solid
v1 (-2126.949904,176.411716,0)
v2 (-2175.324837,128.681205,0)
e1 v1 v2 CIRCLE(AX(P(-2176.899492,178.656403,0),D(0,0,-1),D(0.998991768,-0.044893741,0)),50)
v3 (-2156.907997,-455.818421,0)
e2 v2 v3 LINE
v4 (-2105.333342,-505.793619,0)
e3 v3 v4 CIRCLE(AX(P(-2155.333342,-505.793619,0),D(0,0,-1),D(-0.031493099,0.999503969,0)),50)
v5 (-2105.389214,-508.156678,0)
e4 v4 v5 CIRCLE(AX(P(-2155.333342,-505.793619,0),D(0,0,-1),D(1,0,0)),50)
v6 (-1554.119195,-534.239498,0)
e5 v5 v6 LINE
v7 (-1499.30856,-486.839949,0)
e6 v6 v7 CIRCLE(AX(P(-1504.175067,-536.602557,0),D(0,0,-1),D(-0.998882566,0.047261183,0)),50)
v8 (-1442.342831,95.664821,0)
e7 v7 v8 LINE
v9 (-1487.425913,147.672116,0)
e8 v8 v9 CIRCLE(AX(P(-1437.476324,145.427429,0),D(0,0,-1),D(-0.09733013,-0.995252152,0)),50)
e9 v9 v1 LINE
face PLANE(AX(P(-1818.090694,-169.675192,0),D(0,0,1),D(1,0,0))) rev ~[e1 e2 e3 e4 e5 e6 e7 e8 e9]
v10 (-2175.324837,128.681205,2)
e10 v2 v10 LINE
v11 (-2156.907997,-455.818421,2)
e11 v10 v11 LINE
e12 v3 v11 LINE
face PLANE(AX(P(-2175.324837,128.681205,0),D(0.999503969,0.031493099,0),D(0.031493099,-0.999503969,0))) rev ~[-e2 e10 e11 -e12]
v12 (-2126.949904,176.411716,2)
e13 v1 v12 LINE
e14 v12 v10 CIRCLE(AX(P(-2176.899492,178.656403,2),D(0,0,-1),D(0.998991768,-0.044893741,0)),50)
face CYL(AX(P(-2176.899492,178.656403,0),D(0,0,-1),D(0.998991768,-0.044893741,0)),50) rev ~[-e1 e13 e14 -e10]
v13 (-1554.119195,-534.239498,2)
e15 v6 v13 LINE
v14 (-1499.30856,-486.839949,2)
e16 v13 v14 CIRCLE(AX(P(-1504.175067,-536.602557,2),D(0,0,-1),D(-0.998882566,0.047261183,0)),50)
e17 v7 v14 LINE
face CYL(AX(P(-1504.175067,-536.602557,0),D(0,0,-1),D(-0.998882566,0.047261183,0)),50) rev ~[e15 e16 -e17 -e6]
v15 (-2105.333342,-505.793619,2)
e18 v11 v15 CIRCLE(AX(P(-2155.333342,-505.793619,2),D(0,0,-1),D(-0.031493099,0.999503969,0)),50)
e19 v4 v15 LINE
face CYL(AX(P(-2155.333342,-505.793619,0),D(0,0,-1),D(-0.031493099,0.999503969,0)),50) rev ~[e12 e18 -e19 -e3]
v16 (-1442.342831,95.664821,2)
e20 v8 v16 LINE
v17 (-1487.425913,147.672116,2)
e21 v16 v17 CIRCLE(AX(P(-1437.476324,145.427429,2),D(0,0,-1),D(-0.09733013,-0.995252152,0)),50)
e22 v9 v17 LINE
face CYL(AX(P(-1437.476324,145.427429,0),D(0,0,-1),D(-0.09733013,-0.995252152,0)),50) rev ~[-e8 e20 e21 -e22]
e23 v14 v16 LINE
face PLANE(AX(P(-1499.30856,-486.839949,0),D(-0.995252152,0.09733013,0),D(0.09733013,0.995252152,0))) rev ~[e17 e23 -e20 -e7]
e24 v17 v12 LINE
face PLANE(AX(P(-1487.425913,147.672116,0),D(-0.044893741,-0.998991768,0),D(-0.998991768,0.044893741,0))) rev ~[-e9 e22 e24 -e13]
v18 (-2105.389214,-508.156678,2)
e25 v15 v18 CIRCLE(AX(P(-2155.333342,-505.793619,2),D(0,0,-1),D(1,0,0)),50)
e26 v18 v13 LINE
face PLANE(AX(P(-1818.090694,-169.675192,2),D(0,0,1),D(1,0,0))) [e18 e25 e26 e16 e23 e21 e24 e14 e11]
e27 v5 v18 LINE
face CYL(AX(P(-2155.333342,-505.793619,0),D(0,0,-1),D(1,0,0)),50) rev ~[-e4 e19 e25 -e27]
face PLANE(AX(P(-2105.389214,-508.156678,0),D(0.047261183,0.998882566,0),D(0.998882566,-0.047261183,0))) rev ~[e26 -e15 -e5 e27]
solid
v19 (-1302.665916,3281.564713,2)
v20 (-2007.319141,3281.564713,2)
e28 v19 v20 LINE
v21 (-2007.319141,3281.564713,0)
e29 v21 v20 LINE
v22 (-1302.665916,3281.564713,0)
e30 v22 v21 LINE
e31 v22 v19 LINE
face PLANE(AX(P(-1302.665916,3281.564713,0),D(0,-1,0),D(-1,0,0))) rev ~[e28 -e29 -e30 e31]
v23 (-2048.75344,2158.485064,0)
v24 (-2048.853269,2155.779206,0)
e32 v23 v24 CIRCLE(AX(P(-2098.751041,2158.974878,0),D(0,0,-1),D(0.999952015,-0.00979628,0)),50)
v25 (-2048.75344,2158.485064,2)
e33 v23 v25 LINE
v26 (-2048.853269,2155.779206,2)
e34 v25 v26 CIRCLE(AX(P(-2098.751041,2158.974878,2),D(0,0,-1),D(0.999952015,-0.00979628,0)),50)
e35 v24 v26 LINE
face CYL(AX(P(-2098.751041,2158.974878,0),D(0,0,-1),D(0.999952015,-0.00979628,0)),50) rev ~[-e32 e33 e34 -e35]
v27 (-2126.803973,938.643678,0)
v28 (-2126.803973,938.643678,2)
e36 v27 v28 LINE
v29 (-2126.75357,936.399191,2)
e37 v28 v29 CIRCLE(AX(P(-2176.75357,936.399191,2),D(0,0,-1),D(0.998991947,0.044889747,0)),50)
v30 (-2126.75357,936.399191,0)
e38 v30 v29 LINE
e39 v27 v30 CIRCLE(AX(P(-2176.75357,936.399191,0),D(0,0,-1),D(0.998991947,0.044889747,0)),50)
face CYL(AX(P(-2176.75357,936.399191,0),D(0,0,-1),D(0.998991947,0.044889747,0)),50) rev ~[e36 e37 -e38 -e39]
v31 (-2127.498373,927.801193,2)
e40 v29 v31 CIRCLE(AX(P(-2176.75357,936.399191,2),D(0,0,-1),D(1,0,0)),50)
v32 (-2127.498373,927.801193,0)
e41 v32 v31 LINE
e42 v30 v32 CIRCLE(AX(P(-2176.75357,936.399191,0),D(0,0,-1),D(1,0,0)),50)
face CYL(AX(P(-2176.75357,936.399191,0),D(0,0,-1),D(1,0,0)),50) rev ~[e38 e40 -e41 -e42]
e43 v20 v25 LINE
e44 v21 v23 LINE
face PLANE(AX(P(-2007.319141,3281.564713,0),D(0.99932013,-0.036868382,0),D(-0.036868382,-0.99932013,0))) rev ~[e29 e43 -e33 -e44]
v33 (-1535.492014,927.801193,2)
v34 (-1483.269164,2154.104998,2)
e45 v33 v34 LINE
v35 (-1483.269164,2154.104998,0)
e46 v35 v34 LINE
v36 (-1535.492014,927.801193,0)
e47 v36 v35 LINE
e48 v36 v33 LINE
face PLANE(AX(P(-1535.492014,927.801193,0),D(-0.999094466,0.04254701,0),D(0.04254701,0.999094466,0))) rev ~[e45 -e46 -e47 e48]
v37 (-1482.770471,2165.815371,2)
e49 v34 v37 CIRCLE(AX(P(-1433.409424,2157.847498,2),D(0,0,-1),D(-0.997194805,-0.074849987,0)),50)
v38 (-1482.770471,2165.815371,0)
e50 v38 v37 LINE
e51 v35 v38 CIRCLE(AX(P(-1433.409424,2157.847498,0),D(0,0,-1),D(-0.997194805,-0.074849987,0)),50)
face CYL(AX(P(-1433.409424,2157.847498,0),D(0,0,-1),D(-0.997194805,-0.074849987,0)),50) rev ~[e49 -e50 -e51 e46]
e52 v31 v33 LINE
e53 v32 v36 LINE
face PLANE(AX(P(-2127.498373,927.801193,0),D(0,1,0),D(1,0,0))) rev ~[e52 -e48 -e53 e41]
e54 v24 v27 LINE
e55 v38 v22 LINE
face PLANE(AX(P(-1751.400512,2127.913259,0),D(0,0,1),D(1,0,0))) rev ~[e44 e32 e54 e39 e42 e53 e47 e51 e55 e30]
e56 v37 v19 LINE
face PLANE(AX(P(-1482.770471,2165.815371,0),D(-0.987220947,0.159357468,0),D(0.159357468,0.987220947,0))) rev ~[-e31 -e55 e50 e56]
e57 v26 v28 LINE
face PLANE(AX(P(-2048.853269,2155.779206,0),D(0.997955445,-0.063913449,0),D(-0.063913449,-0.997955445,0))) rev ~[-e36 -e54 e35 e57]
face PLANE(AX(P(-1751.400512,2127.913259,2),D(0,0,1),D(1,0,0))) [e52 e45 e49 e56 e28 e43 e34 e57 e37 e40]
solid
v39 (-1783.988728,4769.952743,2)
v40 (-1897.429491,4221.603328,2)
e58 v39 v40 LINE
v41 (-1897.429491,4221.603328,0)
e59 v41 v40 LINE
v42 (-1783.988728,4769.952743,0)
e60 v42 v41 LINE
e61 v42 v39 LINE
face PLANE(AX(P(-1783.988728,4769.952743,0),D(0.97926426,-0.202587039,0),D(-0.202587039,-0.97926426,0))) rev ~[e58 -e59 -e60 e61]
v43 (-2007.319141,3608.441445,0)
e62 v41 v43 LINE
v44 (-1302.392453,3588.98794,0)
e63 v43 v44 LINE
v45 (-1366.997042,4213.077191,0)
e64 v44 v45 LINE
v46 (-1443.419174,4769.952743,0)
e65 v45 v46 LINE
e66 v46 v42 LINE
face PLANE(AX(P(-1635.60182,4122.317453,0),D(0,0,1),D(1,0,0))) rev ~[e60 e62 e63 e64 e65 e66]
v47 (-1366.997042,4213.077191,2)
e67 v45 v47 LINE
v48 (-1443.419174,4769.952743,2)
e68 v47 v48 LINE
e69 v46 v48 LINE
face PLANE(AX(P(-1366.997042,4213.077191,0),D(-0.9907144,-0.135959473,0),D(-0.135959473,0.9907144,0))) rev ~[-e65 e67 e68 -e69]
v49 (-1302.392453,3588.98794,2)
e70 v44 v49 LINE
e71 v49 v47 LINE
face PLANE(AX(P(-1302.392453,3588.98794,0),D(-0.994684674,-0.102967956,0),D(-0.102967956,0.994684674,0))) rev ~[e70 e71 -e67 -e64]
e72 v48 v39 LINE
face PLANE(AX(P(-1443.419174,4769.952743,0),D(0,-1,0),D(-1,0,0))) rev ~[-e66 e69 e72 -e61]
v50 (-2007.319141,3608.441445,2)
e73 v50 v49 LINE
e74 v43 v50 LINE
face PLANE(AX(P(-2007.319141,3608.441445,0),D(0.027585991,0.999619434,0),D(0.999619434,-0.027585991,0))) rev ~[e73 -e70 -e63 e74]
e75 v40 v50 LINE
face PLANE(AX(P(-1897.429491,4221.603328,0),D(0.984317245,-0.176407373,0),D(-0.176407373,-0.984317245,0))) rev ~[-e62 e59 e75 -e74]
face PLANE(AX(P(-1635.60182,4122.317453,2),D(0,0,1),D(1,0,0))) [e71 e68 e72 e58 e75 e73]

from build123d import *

# Parameters (mm, degrees)
F3_DEPTH = 2
F4_DEPTH = 2
F5_DEPTH = 2


with BuildPart() as f3:
    # F2 (on face) → F3 (new body)
    with BuildSketch(Plane.XY):
        Polygon((-1443.4191744163, 4769.9527426873), (-1783.9887283179, 4769.9527426873), (-1897.4294909214, 4221.6033277621), (-2007.3191407106, 3608.4414445777), (-1302.3924530881, 3588.9879399751), (-1366.9970424155, 4213.0771913099), align=None)
    extrude(amount=F3_DEPTH)


with BuildPart() as f4:
    # F2 (on face) → F4 (new body)
    with BuildSketch(Plane.XY):
        with BuildLine():
            Line((-1482.7704714546, 2165.8153709844), (-1302.6659156704, 3281.5647125244))
            Line((-1302.6659156704, 3281.5647125244), (-2007.3191407106, 3281.5647125244))
            Line((-2007.3191407106, 3281.5647125244), (-2048.7534404071, 2158.4850639998))
            ThreePointArc((-2048.7534404071, 2158.4850639998), (-2048.7850346679, 2157.1314588818), (-2048.8532689015, 2155.7792055394))
            Line((-2048.8532689015, 2155.7792055394), (-2126.8039729209, 938.6436782907))
            ThreePointArc((-2126.8039729209, 938.6436782907), (-2126.7661725299, 937.5217175422), (-2126.753570282, 936.3991909393))
            ThreePointArc((-2126.753570282, 936.3991909393), (-2126.9401190402, 932.0840924022), (-2127.4983732973, 927.8011929161))
            Line((-2127.4983732973, 927.8011929161), (-1535.4920138724, 927.8011929161))
            Line((-1535.4920138724, 927.8011929161), (-1483.2691643821, 2154.1049982133))
            ThreePointArc((-1483.2691643821, 2154.1049982133), (-1483.3641474246, 2159.974848068), (-1482.7704714546, 2165.8153709844))
        make_face()
    extrude(amount=F4_DEPTH)


with BuildPart() as f5:
    # F2 (on face) → F5 (new body)
    with BuildSketch(Plane.XY):
        with BuildLine():
            ThreePointArc((-2126.9499036673, 176.4117163662), (-2141.7820128861, 143.064794042), (-2175.3248371078, 128.6812049348))
            Line((-2175.3248371078, 128.6812049348), (-2156.9079972429, -455.8184208223))
            ThreePointArc((-2156.9079972429, -455.8184208223), (-2120.5391814878, -469.8858711882), (-2105.3333422956, -505.7936192891))
            ThreePointArc((-2105.3333422956, -505.7936192891), (-2105.3473121727, -506.9754790747), (-2105.3892139977, -508.1566784428))
            Line((-2105.3892139977, -508.1566784428), (-1554.1191952458, -534.2394975518))
            ThreePointArc((-1554.1191952458, -534.2394975518), (-1536.8809883486, -498.7829492864), (-1499.3085604422, -486.8399491127))
            Line((-1499.3085604422, -486.8399491127), (-1442.3428307094, 95.664821314))
            ThreePointArc((-1442.3428307094, 95.664821314), (-1475.2571492143, 112.6767149982), (-1487.4259125915, 147.6721159422))
            Line((-1487.4259125915, 147.6721159422), (-2126.9499036673, 176.4117163662))
        make_face()
    extrude(amount=F5_DEPTH)


solid = Compound([f3.part, f4.part, f5.part])
